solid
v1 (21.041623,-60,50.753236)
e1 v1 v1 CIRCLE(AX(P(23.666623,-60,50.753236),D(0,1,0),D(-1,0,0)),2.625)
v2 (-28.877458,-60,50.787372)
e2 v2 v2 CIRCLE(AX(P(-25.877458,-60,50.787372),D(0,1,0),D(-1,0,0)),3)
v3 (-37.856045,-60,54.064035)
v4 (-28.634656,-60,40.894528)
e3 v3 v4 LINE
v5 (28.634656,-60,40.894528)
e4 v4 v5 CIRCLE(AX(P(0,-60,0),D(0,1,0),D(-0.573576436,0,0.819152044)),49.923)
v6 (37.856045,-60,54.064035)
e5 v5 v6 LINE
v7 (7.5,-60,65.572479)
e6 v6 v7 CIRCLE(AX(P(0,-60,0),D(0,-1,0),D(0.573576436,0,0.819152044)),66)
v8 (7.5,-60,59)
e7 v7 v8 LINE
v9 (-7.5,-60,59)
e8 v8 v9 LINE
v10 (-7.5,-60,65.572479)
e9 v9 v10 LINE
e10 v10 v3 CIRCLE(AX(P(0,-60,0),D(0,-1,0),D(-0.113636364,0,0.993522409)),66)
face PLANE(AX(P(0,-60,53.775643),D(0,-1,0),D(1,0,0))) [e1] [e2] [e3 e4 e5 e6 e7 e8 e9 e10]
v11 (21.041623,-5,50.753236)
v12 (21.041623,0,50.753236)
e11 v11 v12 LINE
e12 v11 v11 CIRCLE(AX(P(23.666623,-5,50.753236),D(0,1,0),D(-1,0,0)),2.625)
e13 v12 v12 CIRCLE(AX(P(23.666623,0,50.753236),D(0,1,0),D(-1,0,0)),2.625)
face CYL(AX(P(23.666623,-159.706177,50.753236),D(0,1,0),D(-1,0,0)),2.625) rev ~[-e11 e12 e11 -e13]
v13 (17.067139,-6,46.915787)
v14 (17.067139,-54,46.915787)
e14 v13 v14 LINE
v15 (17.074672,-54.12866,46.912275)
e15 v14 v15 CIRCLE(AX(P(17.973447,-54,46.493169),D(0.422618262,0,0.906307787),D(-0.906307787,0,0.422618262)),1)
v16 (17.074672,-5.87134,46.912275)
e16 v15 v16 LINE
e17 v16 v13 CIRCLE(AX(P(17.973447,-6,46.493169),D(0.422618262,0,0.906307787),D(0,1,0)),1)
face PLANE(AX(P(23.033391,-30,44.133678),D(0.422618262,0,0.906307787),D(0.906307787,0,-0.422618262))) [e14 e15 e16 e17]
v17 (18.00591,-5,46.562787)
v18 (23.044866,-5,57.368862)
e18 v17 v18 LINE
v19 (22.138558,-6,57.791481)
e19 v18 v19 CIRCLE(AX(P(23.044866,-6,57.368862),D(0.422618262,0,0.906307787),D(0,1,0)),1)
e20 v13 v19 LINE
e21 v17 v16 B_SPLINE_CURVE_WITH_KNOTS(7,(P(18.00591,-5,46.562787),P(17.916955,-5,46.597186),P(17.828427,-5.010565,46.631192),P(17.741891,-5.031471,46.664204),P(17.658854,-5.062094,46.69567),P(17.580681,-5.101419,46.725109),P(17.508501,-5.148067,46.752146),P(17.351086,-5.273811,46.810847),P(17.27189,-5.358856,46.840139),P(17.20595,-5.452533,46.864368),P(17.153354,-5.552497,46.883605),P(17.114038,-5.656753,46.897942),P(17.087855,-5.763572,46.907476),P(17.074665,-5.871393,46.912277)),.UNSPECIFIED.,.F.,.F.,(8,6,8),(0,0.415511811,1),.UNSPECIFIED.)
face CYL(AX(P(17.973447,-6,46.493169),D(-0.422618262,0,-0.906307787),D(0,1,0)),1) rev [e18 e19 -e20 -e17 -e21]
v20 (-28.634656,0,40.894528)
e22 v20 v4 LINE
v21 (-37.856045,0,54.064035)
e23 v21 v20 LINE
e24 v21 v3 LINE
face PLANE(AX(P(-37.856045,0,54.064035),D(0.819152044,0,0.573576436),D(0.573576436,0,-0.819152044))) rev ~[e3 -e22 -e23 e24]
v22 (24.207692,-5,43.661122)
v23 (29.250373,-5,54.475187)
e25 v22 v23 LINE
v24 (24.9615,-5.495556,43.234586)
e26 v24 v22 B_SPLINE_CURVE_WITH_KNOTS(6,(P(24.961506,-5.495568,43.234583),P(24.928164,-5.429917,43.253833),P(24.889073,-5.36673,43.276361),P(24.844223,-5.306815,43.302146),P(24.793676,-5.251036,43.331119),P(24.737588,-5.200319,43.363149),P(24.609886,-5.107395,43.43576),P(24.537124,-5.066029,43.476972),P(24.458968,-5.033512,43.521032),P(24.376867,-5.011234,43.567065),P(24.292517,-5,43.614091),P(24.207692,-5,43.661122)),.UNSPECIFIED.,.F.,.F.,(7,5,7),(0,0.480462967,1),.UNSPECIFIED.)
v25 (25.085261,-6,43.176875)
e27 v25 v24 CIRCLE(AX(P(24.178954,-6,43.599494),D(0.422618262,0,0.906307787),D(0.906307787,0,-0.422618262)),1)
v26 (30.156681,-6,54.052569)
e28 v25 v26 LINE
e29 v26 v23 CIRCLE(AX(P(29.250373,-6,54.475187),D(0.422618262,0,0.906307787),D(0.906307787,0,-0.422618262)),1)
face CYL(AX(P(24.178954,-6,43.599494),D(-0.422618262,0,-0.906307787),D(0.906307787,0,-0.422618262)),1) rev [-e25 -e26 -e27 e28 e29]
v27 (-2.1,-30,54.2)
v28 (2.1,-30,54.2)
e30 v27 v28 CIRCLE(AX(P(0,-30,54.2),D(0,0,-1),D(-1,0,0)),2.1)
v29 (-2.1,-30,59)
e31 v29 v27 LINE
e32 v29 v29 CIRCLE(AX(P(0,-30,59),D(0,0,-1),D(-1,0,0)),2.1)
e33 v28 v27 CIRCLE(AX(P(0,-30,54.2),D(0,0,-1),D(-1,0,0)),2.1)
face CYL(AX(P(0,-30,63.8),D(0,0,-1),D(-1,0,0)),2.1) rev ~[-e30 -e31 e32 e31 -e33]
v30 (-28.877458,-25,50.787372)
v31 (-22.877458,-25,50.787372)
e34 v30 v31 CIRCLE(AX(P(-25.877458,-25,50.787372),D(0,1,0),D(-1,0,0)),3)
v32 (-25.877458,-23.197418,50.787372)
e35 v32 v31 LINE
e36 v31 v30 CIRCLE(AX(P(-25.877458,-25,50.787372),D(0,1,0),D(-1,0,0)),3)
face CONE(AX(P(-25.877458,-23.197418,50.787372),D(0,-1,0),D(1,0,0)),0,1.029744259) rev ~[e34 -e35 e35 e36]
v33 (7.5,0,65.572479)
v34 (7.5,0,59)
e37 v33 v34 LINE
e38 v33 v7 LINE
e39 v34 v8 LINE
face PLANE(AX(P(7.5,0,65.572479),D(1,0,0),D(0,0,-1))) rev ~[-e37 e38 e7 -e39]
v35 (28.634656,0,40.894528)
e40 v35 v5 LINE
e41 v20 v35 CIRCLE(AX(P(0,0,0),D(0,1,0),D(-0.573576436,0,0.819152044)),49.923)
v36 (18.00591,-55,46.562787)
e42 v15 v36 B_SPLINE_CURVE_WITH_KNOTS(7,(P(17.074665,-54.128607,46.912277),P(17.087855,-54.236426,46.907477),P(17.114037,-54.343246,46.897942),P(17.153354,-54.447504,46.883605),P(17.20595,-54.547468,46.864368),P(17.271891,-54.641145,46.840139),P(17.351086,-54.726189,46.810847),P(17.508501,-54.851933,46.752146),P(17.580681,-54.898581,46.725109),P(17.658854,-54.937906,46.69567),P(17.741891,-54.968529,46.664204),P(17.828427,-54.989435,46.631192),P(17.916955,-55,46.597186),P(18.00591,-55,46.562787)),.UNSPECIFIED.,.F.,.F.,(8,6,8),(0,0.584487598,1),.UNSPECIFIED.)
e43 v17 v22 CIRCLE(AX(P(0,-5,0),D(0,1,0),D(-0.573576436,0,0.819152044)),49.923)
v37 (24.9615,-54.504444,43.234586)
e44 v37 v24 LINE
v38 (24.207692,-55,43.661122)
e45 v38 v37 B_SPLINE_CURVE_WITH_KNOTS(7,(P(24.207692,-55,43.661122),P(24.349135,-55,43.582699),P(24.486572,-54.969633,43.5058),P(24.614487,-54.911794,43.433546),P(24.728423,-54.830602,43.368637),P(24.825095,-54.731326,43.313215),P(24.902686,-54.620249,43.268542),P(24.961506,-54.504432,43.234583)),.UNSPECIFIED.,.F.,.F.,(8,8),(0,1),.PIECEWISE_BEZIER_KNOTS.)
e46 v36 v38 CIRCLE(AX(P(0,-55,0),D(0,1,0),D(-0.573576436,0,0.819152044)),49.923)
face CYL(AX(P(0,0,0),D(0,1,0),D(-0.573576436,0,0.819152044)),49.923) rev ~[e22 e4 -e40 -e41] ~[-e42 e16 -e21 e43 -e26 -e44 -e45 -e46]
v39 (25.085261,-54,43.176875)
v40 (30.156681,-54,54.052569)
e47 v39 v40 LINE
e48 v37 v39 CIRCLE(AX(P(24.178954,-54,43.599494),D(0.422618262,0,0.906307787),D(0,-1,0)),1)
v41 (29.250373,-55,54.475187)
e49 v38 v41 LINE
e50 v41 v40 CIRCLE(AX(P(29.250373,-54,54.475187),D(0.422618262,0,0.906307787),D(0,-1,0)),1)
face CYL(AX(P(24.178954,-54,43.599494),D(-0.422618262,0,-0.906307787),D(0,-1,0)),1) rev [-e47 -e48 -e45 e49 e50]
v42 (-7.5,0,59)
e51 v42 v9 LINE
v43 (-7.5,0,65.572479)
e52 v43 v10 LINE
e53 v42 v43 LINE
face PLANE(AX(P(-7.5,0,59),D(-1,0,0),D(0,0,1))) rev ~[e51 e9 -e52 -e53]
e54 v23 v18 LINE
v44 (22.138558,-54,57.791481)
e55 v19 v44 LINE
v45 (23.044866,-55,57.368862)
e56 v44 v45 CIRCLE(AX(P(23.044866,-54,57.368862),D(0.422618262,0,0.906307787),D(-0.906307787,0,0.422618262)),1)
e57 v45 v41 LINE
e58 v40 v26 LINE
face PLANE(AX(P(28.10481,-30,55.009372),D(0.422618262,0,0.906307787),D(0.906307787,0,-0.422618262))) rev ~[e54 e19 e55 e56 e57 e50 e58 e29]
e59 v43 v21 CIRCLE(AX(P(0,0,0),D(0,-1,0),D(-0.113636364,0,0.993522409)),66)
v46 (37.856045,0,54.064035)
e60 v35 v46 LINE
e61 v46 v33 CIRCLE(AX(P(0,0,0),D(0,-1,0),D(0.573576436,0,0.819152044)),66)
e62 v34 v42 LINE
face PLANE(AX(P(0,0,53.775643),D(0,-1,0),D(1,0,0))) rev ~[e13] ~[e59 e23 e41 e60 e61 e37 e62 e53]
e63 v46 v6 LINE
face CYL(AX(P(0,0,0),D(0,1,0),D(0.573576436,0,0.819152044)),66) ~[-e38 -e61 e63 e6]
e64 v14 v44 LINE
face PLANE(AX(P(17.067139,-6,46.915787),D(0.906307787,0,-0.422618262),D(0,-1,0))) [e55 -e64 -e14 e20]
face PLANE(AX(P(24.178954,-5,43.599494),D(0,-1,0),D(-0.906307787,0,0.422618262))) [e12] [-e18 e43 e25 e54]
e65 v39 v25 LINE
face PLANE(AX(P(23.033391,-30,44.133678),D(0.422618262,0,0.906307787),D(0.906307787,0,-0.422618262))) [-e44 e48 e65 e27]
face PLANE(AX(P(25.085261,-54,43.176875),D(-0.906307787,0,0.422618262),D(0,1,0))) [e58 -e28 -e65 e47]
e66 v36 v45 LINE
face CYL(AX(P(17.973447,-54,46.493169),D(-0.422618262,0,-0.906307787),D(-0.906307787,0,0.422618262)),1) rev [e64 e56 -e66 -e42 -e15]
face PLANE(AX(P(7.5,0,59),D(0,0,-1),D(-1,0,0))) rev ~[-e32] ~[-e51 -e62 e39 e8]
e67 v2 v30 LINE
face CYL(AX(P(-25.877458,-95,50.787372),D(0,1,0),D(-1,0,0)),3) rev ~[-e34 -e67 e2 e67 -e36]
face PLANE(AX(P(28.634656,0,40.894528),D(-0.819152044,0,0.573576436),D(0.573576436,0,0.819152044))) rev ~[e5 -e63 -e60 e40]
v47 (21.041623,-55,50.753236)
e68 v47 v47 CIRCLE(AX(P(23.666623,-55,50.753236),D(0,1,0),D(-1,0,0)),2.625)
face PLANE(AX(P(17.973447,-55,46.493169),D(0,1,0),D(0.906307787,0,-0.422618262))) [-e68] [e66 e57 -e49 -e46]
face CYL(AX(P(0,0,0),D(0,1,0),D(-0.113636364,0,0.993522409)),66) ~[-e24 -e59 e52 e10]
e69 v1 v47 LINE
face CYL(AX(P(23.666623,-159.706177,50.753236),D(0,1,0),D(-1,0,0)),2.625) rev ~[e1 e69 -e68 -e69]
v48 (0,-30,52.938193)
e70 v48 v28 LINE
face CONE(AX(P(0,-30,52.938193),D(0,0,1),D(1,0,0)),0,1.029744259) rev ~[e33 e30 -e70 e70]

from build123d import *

# Parameters (mm, degrees)
F3_DEPTH  = 60
F9_D      = 6
F9_DEPTH  = 35
F9_TIP    = 1.8025818571
F10_D     = 4.2
F10_DEPTH = 4.8
F10_TIP   = 1.2618073
F11_DEPTH = 12
F12_D     = 5.25


# Not quite as in the source:
# - a feature of the source that left no trace in its solid (it failed there, or was rolled back) is left out
# - a feature names something its author has since deleted; it is built from what else it names


with BuildPart() as f3:
    # F2 (on Front) → F3 (new body)
    with BuildSketch(Plane.XZ):
        with BuildLine():
            ThreePointArc((-28.634656432, 40.894527507), (0, 49.923), (28.634656432, 40.894527507))
            Line((28.634656432, 40.894527507), (37.8560447992, 54.0640349231))
            ThreePointArc((37.8560447992, 54.0640349231), (23.3966615381, 61.7138252653), (7.5, 65.5724789832))
            Line((7.5, 65.5724789832), (7.5, 59))
            Line((7.5, 59), (0, 59))
            Line((0, 59), (-7.5, 59))
            Line((-7.5, 59), (-7.5, 65.5724789832))
            ThreePointArc((-7.5, 65.5724789832), (-23.3966615381, 61.7138252653), (-37.8560447992, 54.0640349231))
            Line((-37.8560447992, 54.0640349231), (-28.634656432, 40.894527507))
        make_face()
    extrude(amount=F3_DEPTH)

    # F9
    with Locations(Plane.XZ.offset(60)):
        with Locations((-25.8774584852, 50.7873718787)):
            Hole(F9_D / 2, depth=F9_DEPTH)
            with Locations((0, 0, -(F9_DEPTH + F9_TIP / 2))):  # 118° drill point
                Cone(0, F9_D / 2, F9_TIP, mode=Mode.SUBTRACT)

    # F10
    with Locations(Plane.XY.offset(59)):
        with Locations((0, -30)):
            Hole(F10_D / 2, depth=F10_DEPTH)
            with Locations((0, 0, -(F10_DEPTH + F10_TIP / 2))):  # 118° drill point
                Cone(0, F10_D / 2, F10_TIP, mode=Mode.SUBTRACT)

    # F7 (on line) → F11 (cut)
    with BuildSketch(Plane(origin=(21.0180858076, 0, 45.0734304703), x_dir=(0.906307787, 0, -0.4226182617), z_dir=(0.4226182617, 0, 0.906307787))):
        with BuildLine():
            Line((0, -5), (0, -55))
            Line((0, -55), (3.487631816, -55))
            ThreePointArc((3.487631816, -55), (4.1947385971, -54.7071067812), (4.487631816, -54))
            Line((4.487631816, -54), (4.487631816, -6))
            ThreePointArc((4.487631816, -6), (4.1947385971, -5.2928932188), (3.487631816, -5))
            Line((3.487631816, -5), (0, -5))
        make_face()
        with BuildLine():
            Line((-3.359387327, -55), (0, -55))
            Line((0, -55), (0, -5))
            Line((0, -5), (-3.359387327, -5))
            ThreePointArc((-3.359387327, -5), (-4.0664941082, -5.2928932188), (-4.359387327, -6))
            Line((-4.359387327, -6), (-4.359387327, -54))
            ThreePointArc((-4.359387327, -54), (-4.0664941082, -54.7071067812), (-3.359387327, -55))
        make_face()
    extrude(amount=F11_DEPTH, mode=Mode.SUBTRACT)

    # F12 (through all)
    with Locations(Plane.XZ.offset(60)):
        with Locations((23.6666226575, 50.7532360741)):
            Hole(F12_D / 2)


solid = f3.part
